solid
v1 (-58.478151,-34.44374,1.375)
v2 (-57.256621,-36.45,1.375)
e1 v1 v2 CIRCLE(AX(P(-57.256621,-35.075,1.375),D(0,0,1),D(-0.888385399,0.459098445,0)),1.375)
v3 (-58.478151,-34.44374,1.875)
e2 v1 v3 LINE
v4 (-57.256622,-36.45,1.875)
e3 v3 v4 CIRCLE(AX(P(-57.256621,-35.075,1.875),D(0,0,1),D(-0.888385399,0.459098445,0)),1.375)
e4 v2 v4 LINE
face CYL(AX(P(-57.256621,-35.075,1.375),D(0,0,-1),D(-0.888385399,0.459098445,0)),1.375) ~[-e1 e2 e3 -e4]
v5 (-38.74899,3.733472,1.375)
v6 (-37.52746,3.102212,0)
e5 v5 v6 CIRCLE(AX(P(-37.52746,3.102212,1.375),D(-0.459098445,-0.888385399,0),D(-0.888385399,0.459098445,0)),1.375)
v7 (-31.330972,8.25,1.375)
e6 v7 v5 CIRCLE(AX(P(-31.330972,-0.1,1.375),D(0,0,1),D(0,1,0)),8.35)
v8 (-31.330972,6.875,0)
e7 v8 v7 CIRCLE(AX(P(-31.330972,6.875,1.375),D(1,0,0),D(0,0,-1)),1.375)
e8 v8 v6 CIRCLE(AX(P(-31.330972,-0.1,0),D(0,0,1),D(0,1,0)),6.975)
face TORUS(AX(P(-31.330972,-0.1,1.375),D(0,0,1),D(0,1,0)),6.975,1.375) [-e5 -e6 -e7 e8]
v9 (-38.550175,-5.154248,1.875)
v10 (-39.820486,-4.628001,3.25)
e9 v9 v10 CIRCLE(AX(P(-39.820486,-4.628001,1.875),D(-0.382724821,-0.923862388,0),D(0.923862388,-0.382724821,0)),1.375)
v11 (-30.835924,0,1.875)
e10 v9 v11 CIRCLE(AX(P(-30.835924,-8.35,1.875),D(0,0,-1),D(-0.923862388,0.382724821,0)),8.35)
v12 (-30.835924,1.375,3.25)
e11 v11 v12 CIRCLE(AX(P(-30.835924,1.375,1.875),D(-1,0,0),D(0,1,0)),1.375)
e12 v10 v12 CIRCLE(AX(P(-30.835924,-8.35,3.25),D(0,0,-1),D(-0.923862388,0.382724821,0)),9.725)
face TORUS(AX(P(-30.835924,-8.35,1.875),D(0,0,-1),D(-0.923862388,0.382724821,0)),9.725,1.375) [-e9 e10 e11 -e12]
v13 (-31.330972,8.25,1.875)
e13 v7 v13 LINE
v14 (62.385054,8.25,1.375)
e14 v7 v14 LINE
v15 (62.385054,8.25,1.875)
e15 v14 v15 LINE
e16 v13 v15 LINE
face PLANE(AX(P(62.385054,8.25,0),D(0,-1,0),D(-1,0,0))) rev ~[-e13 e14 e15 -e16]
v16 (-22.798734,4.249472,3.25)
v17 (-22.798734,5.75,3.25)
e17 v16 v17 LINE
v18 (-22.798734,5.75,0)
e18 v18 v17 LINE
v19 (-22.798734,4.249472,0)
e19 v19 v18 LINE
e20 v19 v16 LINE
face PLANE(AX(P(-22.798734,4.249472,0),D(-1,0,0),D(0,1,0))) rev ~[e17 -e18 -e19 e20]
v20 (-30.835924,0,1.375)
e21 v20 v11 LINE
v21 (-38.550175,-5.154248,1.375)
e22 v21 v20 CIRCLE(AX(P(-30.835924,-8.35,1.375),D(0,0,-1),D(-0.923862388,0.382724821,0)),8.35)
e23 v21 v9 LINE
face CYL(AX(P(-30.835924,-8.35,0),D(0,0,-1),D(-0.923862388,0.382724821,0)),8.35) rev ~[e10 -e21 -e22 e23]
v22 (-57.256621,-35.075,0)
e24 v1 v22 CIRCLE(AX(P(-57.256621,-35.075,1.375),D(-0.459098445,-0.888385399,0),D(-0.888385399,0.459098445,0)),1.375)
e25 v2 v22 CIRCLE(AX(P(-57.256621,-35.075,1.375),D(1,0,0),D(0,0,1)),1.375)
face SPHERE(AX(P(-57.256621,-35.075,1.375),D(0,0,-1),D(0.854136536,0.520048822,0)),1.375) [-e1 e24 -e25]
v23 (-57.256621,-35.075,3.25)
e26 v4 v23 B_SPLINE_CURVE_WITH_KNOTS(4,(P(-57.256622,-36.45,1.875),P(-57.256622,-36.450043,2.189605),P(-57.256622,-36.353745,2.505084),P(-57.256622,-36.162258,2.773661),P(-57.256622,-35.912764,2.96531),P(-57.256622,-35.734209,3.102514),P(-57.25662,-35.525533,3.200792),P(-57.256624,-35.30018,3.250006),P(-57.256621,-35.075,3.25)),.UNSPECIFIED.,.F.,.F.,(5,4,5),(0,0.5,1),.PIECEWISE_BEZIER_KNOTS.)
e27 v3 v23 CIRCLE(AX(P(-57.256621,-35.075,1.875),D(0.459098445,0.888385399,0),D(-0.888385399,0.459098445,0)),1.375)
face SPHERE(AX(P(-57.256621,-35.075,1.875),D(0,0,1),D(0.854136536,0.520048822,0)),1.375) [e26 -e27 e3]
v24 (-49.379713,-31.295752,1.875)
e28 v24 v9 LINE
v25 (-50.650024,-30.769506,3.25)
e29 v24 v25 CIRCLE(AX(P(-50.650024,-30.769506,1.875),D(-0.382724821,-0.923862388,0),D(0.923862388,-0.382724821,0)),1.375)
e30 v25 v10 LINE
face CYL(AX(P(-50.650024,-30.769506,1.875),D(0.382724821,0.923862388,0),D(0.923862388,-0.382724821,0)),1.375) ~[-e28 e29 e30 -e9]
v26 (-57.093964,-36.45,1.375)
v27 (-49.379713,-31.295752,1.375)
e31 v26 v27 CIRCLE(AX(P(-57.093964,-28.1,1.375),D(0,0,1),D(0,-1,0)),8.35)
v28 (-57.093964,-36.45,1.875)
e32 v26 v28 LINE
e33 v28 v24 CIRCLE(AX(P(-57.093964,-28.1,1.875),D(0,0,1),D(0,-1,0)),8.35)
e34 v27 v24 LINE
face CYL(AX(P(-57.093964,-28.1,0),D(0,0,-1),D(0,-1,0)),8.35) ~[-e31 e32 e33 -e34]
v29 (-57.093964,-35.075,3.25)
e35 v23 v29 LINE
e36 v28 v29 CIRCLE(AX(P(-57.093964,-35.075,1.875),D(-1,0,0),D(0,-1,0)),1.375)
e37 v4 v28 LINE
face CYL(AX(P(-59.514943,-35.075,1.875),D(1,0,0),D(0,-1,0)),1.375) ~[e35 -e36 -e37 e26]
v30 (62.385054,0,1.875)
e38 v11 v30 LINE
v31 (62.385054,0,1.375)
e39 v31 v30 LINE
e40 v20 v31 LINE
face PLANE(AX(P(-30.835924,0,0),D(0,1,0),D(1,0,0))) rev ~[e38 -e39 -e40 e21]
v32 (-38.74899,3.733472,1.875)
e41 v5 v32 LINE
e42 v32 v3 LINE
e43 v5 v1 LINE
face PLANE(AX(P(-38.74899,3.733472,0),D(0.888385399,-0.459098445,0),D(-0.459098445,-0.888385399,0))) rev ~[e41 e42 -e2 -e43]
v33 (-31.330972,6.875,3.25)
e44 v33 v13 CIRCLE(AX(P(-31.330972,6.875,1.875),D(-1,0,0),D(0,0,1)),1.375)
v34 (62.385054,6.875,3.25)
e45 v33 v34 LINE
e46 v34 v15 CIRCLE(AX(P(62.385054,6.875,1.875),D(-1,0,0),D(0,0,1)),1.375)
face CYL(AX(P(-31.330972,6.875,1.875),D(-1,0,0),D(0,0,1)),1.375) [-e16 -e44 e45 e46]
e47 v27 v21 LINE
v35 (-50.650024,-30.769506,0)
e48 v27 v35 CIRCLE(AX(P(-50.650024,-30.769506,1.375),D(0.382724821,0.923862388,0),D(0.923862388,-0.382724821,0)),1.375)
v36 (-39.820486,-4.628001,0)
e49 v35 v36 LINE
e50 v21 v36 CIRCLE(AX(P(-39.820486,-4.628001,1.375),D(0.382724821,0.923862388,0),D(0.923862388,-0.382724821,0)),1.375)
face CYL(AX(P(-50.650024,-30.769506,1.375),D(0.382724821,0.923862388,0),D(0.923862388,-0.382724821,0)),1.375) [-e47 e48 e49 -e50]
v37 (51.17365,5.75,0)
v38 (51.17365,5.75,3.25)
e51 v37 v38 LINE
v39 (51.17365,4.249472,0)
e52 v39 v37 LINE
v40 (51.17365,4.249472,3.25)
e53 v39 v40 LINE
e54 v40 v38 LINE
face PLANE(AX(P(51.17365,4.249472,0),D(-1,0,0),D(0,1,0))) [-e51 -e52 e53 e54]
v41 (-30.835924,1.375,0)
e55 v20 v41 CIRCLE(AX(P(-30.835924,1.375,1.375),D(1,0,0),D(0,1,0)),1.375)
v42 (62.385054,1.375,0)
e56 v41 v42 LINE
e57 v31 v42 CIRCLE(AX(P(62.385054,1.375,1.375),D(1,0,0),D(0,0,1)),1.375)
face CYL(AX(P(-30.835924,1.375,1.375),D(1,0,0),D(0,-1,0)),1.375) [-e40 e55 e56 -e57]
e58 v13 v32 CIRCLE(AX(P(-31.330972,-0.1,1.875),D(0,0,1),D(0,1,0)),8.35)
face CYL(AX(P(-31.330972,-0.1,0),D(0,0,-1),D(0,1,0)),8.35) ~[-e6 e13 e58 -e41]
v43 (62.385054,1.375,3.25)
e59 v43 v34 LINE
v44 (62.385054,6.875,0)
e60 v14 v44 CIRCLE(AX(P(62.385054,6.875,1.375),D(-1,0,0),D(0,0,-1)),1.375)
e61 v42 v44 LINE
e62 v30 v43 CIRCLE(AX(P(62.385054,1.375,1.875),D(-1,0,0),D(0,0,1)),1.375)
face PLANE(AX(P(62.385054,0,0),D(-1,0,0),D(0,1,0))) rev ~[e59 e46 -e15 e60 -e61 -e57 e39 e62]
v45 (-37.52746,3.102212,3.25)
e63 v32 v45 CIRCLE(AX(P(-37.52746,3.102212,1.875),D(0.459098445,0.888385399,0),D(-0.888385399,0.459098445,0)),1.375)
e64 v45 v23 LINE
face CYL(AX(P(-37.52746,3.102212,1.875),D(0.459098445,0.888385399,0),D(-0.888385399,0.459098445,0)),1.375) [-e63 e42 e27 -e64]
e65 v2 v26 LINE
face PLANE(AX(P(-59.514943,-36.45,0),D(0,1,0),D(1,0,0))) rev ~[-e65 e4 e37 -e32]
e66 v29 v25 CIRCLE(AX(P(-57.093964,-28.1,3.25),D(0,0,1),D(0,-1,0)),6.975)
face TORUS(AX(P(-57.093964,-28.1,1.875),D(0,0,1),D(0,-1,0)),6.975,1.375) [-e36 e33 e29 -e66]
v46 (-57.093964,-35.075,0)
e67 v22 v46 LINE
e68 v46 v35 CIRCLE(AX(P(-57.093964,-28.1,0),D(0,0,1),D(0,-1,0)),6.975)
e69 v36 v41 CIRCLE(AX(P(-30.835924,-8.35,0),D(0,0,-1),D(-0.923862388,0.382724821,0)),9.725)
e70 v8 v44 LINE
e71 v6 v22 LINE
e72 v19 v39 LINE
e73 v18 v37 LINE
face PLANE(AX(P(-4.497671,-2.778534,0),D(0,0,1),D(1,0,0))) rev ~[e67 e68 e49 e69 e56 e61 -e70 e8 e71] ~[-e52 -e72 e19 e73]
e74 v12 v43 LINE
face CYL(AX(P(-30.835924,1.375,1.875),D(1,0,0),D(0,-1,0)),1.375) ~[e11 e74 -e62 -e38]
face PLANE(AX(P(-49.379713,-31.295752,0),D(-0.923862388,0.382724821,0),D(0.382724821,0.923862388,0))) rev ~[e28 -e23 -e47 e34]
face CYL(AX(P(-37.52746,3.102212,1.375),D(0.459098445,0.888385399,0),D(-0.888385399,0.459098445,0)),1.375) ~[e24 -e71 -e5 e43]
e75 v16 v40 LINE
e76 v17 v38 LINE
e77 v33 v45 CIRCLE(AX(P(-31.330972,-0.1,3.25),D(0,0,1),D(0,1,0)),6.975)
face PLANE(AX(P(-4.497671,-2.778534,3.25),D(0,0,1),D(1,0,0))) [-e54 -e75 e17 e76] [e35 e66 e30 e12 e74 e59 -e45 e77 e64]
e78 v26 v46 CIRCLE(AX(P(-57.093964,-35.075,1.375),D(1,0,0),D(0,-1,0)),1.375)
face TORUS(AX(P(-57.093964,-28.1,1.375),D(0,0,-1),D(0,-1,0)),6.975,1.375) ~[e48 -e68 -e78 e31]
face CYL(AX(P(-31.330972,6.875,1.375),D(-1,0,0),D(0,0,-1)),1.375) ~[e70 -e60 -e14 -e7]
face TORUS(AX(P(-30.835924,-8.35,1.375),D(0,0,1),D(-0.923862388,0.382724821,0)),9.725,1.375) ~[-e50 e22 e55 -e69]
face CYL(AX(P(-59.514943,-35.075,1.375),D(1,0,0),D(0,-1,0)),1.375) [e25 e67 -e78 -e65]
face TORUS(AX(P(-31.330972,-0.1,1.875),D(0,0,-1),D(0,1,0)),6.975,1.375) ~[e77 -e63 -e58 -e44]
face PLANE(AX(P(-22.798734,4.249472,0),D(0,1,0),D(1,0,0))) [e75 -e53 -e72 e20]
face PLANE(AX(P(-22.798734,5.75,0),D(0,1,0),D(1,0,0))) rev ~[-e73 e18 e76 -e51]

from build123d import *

# Parameters (mm, degrees)
F0_W         = 73.972383514
F0_H         = 1.5005278401
F1_DEPTH     = 3.25
F2_R         = 1.375
F3_R         = 1.375
F4_T1_DEPTH  = 42.9737045288
F4_T3_DEPTH  = 0.5
F4_T5_DEPTH  = 97.1535263256
F4_T10_DEPTH = 1.375
F4_T16_DEPTH = 1.375
F4_T20_ANGLE = 62.6710528925
F4_T22_ANGLE = 62.6710528925


# Not quite as in the source:
# - a fillet or chamfer that OpenCascade refuses, or shapes differently, is made with other operations: its cross-section is extruded or revolved along the edge and cut away or added


with BuildPart() as f1:
    # F0 (on Top) → F1 (new body)
    with BuildSketch(Plane.XY):
        with BuildLine():
            Line((62.3850544982, 0), (62.3850544982, 8.25))
            Line((62.3850544982, 8.25), (-31.3309718274, 8.25))
            ThreePointArc((-31.3309718274, 8.25), (-35.6733794922, 7.0320400779), (-38.7489899112, 3.7334720175))
            Line((-38.7489899112, 3.7334720175), (-59.5149430004, -36.45))
            Line((-59.5149430004, -36.45), (-57.0939640871, -36.45))
            ThreePointArc((-57.0939640871, -36.45), (-52.4551081593, -35.0428751739), (-49.3797131513, -31.2957522588))
            Line((-49.3797131513, -31.2957522588), (-38.5501753509, -5.1542477412))
            ThreePointArc((-38.5501753509, -5.1542477412), (-35.474780343, -1.4071248261), (-30.8359244151, 0))
            Line((-30.8359244151, 0), (62.3850544982, 0))
        make_face()
        with Locations((14.1874579713, 4.9997360799)):
            Rectangle(F0_W, F0_H, mode=Mode.SUBTRACT)
    extrude(amount=F1_DEPTH)

    # F2
    f2_edges = [f1.edges().sort_by_distance(p)[0] for p in [
        (15.774565, 0, 3.25),
    ]]
    fillet(f2_edges, radius=F2_R)

    # F3
    f3_edges = [f1.edges().sort_by_distance(p)[0] for p in [
        (15.774565, 0, 0),
    ]]
    fillet(f3_edges, radius=F3_R)

    # F4: fillet of radius 1.375 on 2 edges, made by hand

    # F4_s2 → F4_t1 (cut)
    with BuildSketch(Plane(origin=(-6.6444578792, -12.8574588468, 0), x_dir=(0, 0, 1), z_dir=(-0.4590984452, -0.8883853993, 0))):
        with BuildLine():
            ThreePointArc((1.375, 36.1380680715), (0.4027281759, 35.7353398956), (0, 34.7630680715))
            Line((0, 34.7630680715), (0, 36.1380680715))
            Line((0, 36.1380680715), (1.375, 36.1380680715))
        make_face()
        with BuildLine():
            ThreePointArc((1.875, 36.1380680715), (2.8472718241, 35.7353398956), (3.25, 34.7630680715))
            Line((3.25, 34.7630680715), (3.25, 36.1380680715))
            Line((3.25, 36.1380680715), (1.875, 36.1380680715))
        make_face()
    extrude(amount=F4_T1_DEPTH, mode=Mode.SUBTRACT)

    # F4_s4 → F4_t3 (cut)
    with BuildSketch(Plane.XY.offset(1.375)):
        with BuildLine():
            ThreePointArc((-58.478150845, -34.4437396378), (-58.4310586584, -35.7900671304), (-57.256620921, -36.45))
            Line((-57.256620921, -36.45), (-59.5149430004, -36.45))
            Line((-59.5149430004, -36.45), (-58.478150845, -34.4437396378))
        make_face()
    extrude(amount=F4_T3_DEPTH, mode=Mode.SUBTRACT)

    # F4_s6 → F4_t5 (cut)
    with BuildSketch(Plane.YZ.offset(-31.3309718274)):
        with BuildLine():
            ThreePointArc((6.875, 3.25), (7.8472718241, 2.8472718241), (8.25, 1.875))
            Line((8.25, 1.875), (8.25, 3.25))
            Line((8.25, 3.25), (6.875, 3.25))
        make_face()
        with BuildLine():
            ThreePointArc((6.875, 0), (7.8472718241, 0.4027281759), (8.25, 1.375))
            Line((8.25, 1.375), (8.25, 0))
            Line((8.25, 0), (6.875, 0))
        make_face()
    extrude(amount=F4_T5_DEPTH, mode=Mode.SUBTRACT)


with BuildPart() as f4_tool8:
    # F4_s9 → F4_t10 (new body)
    with BuildSketch(Plane.XY.offset(1.875)):
        Polygon((-57.256620921, -35.075), (-58.478150845, -34.4437396378), (-59.5149430004, -36.45), (-57.256620921, -36.45), align=None)
    extrude(amount=F4_T10_DEPTH)

    # F4_s11 → F4_t12 (revolve, cut)
    with BuildSketch(Plane(origin=(-57.256620921, -35.075, 1.875), x_dir=(0.8541365363, 0.5200488221, 0), z_dir=(0.5200488221, -0.8541365363, 0))):
        with BuildLine():
            ThreePointArc((0, -1.375), (1.375, 0), (0, 1.375))
            Line((0, 1.375), (0, -1.375))
        make_face()
    revolve(axis=Axis((-57.256620921, -35.075, 1.875), (0, 0, 1)), mode=Mode.SUBTRACT)


with BuildPart() as f1_1:
    add(f1.part)

    # F4_t7: cut F4_tool8
    add(f4_tool8.part, mode=Mode.SUBTRACT)


with BuildPart() as f4_tool14:
    # F4_s15 → F4_t16 (new body)
    with BuildSketch(Plane.XY.offset(1.375)):
        Polygon((-57.256620921, -35.075), (-58.478150845, -34.4437396378), (-59.5149430004, -36.45), (-57.256620921, -36.45), align=None)
    extrude(amount=-F4_T16_DEPTH)

    # F4_s17 → F4_t18 (revolve, cut)
    with BuildSketch(Plane(origin=(-57.256620921, -35.075, 1.375), x_dir=(0.8541365363, 0.5200488221, 0), z_dir=(-0.5200488221, 0.8541365363, 0))):
        with BuildLine():
            ThreePointArc((0, -1.375), (1.375, 0), (0, 1.375))
            Line((0, 1.375), (0, -1.375))
        make_face()
    revolve(axis=Axis((-57.256620921, -35.075, 1.375), (0, 0, -1)), mode=Mode.SUBTRACT)


with BuildPart() as f1_2:
    add(f1_1.part)

    # F4_t13: cut F4_tool14
    add(f4_tool14.part, mode=Mode.SUBTRACT)

    # F4_s19 → F4_t20 (revolve, cut)
    with BuildSketch(Plane.YZ.offset(-31.3309718274)):
        with BuildLine():
            ThreePointArc((6.875, 3.25), (7.8472718241, 2.8472718241), (8.25, 1.875))
            Line((8.25, 1.875), (8.25, 3.25))
            Line((8.25, 3.25), (6.875, 3.25))
        make_face()
    revolve(axis=Axis((-31.3309718274, -0.1, 3.25), (0, 0, 1)), revolution_arc=F4_T20_ANGLE, mode=Mode.SUBTRACT)

    # F4_s21 → F4_t22 (revolve, cut)
    with BuildSketch(Plane.YZ.offset(-31.3309718274)):
        with BuildLine():
            ThreePointArc((6.875, 0), (7.8472718241, 0.4027281759), (8.25, 1.375))
            Line((8.25, 1.375), (8.25, 0))
            Line((8.25, 0), (6.875, 0))
        make_face()
    revolve(axis=Axis((-31.3309718274, -0.1, 0), (0, 0, 1)), revolution_arc=F4_T22_ANGLE, mode=Mode.SUBTRACT)


solid = f1_2.part
